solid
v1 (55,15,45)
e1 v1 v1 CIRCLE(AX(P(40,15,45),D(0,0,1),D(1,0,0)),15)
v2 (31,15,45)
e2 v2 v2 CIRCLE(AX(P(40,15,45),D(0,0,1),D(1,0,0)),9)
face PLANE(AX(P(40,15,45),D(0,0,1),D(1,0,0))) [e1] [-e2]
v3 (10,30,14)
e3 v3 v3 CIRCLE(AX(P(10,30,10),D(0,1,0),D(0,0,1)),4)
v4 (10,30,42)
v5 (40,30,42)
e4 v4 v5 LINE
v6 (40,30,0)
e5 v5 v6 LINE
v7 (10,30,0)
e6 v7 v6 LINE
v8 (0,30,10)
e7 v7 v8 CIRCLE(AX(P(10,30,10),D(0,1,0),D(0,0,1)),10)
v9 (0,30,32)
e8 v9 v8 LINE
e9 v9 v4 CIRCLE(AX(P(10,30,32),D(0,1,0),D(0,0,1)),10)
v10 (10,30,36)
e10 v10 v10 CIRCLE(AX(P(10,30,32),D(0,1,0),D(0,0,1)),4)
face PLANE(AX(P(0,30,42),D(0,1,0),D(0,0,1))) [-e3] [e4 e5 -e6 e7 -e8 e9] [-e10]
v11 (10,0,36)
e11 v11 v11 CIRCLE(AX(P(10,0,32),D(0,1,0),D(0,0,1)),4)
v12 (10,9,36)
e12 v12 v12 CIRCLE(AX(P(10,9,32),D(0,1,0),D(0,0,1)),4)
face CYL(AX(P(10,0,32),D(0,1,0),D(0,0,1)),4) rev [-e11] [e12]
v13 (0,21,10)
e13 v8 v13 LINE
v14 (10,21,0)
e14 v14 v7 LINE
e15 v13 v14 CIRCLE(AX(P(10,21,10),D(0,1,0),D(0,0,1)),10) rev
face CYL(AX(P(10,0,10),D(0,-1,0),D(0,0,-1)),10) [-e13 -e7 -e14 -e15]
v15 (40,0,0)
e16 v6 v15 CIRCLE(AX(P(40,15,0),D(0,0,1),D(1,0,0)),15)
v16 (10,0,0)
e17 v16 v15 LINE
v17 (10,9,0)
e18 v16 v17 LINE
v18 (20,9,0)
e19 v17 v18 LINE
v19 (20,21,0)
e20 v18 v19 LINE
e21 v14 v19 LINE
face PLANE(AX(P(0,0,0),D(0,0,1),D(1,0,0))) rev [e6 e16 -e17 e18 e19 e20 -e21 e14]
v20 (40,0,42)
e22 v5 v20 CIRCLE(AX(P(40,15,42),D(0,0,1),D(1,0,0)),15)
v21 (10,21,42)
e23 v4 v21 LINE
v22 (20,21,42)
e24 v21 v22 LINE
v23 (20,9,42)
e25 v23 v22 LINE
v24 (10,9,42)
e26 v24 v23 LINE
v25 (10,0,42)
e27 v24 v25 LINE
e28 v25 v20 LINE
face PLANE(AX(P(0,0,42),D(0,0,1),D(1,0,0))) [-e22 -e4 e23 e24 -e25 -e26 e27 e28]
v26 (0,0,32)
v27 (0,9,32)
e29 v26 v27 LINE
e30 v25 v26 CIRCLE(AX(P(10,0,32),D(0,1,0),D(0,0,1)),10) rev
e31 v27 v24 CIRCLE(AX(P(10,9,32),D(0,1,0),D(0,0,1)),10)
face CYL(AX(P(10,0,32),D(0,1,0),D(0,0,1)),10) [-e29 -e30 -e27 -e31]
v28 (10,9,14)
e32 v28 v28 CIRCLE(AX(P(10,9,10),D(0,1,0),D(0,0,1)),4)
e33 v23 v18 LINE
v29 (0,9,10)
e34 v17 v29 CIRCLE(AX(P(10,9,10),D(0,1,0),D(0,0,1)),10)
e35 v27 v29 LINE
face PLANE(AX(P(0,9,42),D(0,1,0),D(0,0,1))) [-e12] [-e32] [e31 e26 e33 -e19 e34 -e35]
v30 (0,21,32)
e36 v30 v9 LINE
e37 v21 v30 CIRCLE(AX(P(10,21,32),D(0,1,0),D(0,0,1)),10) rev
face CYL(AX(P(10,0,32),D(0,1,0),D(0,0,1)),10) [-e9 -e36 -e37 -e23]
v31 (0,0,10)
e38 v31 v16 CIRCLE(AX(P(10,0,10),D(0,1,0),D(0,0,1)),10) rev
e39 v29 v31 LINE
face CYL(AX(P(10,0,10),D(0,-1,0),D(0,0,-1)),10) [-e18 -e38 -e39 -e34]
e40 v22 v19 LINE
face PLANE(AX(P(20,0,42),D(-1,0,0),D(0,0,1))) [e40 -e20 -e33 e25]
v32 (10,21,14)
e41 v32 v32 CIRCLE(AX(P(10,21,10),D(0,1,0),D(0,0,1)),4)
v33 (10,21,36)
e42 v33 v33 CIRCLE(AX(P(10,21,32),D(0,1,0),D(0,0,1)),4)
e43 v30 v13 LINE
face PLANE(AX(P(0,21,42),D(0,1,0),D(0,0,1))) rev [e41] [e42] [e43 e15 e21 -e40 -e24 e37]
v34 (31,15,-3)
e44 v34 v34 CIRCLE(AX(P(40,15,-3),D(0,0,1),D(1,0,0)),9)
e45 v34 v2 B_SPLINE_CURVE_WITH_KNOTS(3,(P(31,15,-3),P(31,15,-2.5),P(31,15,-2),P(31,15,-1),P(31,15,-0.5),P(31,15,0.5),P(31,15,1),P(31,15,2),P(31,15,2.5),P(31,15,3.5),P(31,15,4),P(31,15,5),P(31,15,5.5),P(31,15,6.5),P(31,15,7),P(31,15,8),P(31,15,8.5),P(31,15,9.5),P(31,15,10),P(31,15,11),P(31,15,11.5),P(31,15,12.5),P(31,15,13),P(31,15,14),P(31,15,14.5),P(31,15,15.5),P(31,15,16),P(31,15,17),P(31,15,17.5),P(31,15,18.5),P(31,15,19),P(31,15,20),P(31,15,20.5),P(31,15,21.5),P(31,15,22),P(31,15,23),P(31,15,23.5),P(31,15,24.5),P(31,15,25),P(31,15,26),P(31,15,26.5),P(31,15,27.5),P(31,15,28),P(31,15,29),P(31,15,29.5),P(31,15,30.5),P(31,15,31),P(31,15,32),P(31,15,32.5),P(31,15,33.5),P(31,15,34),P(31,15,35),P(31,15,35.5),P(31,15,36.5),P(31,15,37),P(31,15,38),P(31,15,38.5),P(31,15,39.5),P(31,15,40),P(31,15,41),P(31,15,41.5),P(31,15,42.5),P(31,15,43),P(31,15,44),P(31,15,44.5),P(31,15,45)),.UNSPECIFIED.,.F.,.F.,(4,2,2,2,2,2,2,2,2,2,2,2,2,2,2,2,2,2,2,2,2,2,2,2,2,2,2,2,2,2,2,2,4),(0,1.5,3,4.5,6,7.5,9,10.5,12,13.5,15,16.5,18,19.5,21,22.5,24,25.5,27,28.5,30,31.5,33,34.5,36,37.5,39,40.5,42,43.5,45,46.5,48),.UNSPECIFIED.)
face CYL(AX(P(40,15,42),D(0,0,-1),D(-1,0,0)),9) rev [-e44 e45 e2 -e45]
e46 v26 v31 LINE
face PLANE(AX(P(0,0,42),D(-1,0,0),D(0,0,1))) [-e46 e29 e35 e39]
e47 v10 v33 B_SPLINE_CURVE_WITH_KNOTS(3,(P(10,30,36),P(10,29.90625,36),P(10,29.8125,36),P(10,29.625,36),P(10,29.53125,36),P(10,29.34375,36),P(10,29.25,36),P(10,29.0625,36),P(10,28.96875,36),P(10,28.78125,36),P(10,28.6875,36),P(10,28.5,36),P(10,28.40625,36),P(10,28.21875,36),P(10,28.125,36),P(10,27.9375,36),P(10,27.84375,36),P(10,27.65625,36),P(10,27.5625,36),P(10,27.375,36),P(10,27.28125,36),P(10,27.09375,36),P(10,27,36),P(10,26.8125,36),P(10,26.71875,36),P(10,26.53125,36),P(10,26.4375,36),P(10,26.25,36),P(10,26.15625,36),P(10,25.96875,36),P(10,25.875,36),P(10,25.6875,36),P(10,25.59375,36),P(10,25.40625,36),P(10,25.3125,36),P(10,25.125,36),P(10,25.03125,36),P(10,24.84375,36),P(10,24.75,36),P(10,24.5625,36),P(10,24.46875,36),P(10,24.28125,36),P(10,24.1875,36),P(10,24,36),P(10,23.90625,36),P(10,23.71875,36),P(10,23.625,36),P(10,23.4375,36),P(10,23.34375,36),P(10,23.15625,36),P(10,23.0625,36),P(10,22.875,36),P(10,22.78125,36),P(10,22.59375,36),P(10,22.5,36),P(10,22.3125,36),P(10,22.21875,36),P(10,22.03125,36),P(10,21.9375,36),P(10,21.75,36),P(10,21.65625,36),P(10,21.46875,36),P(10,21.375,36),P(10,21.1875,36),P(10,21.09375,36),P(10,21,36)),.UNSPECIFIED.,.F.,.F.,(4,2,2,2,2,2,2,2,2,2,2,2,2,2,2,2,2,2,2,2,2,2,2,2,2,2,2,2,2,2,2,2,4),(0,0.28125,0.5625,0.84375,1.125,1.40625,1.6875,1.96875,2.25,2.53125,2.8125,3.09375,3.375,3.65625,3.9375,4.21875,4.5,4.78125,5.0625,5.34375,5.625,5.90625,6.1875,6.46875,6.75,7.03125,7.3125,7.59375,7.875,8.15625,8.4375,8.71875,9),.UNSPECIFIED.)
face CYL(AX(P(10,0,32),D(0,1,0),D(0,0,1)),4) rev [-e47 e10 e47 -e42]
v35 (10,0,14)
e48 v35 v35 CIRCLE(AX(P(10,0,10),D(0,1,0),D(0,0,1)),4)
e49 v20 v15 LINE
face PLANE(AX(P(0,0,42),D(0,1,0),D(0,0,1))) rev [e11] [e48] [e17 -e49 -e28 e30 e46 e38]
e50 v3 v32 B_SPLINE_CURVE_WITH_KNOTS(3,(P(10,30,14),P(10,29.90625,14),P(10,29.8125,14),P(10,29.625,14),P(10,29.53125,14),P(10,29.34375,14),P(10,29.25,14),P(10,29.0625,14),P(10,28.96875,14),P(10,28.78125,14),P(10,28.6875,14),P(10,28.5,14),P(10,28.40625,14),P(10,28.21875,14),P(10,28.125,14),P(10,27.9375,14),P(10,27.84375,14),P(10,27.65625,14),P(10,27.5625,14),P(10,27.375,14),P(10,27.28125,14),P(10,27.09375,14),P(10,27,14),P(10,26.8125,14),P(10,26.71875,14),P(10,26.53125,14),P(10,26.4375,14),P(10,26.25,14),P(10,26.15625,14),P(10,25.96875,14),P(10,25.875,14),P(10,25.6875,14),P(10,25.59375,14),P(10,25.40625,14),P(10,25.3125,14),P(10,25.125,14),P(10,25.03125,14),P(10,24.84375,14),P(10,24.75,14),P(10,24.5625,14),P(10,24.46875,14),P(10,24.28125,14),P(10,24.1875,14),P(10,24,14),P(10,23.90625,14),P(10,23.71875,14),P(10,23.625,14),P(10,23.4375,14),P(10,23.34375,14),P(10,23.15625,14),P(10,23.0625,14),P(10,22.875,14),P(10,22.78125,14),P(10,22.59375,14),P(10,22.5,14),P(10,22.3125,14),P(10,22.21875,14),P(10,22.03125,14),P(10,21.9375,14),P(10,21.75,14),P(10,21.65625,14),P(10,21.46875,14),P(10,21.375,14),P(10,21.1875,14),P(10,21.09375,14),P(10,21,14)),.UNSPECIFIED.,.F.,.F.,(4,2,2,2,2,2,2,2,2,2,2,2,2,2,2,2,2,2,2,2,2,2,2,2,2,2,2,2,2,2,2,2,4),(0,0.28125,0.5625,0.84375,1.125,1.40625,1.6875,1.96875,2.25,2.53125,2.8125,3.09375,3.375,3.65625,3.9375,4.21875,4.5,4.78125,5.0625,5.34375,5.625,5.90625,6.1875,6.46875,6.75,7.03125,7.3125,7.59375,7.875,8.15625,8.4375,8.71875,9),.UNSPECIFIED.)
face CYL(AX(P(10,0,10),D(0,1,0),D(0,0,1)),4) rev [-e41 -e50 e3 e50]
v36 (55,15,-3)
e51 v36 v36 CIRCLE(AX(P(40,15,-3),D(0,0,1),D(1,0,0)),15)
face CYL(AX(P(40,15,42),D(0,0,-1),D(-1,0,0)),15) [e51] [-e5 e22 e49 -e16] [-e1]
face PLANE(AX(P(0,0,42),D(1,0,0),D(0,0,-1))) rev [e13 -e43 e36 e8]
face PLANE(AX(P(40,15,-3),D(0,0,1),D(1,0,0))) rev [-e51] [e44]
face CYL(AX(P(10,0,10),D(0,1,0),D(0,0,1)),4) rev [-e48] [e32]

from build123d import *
from build123d.topology import SkipClean

# Parameters (mm, degrees)
SKETCH_1_R               = 9
EXTRUDE_1_DEPTH          = 42
EXTRUDE_3_DEPTH          = 3
EXTRUDE_3_DEPTH_BACK     = 45
SKETCH_2_R               = 15
SKETCH_2_R_2             = 9
CUT_EXTRUDE_1_DEPTH      = 78.136243103
CUT_EXTRUDE_1_DEPTH_BACK = 78.136243103
SKETCH_3_R               = 4
CUT_EXTRUDE_2_DEPTH      = 78.136243103
CUT_EXTRUDE_2_DEPTH_BACK = 78.136243103
SKETCH_4_R               = 4
FILLET_5_R               = 10


with BuildPart() as part:
    # 草图1 → 凸台-拉伸1 (new body)
    with BuildSketch(Plane.XY):
        with BuildLine():
            Line((0, 9), (0, 0))
            Line((0, 0), (40, 0))
            ThreePointArc((40, 0), (55, 15), (40, 30))
            Line((40, 30), (0, 30))
            Line((0, 30), (0, 21))
            Line((0, 21), (20, 21))
            Line((20, 21), (20, 9))
            Line((20, 9), (0, 9))
        make_face()
        with Locations((40, 15)):
            Circle(SKETCH_1_R, mode=Mode.SUBTRACT)
    extrude(amount=EXTRUDE_1_DEPTH)

    # 草图2 → 凸台-拉伸3 (add, two sides: drawn at the far end of the back side and taken through both)
    with SkipClean():  # the faces are left unmerged after this step: merging them gives an invalid solid
        with BuildSketch(Plane.XY.offset(42).offset(-EXTRUDE_3_DEPTH_BACK)):
            with Locations((40, 15)):
                Circle(SKETCH_2_R)
            with Locations((40, 15)):
                Circle(SKETCH_2_R_2, mode=Mode.SUBTRACT)
        extrude(amount=EXTRUDE_3_DEPTH + EXTRUDE_3_DEPTH_BACK)
    add(part.part.scale(1), mode=Mode.REPLACE)  # the faces are merged on a copy

    # 草图3 → 切除-拉伸1 (cut, two sides: drawn at the far end of the back side and taken through both)
    with BuildSketch(Plane(origin=(0, 30, 0), x_dir=(1, 0, 0), z_dir=(0, 1, 0)).offset(-CUT_EXTRUDE_1_DEPTH_BACK)):
        with Locations((10, -10)):
            Circle(SKETCH_3_R)
    extrude(amount=CUT_EXTRUDE_1_DEPTH + CUT_EXTRUDE_1_DEPTH_BACK, mode=Mode.SUBTRACT)

    # 草图4 → 切除-拉伸2 (cut, two sides: drawn at the far end of the back side and taken through both)
    with BuildSketch(Plane(origin=(0, 30, 0), x_dir=(1, 0, 0), z_dir=(0, 1, 0)).offset(-CUT_EXTRUDE_2_DEPTH_BACK)):
        with Locations((10, -32)):
            Circle(SKETCH_4_R)
    extrude(amount=CUT_EXTRUDE_2_DEPTH + CUT_EXTRUDE_2_DEPTH_BACK, mode=Mode.SUBTRACT)

    # 圆角5
    fillet_5_edges = [part.edges().sort_by_distance(p)[0] for p in [
        (0, 25.5, 0),
        (0, 4.5, 0),
        (0, 4.5, 42),
        (0, 25.5, 42),
    ]]
    fillet(fillet_5_edges, radius=FILLET_5_R)


solid = part.part
